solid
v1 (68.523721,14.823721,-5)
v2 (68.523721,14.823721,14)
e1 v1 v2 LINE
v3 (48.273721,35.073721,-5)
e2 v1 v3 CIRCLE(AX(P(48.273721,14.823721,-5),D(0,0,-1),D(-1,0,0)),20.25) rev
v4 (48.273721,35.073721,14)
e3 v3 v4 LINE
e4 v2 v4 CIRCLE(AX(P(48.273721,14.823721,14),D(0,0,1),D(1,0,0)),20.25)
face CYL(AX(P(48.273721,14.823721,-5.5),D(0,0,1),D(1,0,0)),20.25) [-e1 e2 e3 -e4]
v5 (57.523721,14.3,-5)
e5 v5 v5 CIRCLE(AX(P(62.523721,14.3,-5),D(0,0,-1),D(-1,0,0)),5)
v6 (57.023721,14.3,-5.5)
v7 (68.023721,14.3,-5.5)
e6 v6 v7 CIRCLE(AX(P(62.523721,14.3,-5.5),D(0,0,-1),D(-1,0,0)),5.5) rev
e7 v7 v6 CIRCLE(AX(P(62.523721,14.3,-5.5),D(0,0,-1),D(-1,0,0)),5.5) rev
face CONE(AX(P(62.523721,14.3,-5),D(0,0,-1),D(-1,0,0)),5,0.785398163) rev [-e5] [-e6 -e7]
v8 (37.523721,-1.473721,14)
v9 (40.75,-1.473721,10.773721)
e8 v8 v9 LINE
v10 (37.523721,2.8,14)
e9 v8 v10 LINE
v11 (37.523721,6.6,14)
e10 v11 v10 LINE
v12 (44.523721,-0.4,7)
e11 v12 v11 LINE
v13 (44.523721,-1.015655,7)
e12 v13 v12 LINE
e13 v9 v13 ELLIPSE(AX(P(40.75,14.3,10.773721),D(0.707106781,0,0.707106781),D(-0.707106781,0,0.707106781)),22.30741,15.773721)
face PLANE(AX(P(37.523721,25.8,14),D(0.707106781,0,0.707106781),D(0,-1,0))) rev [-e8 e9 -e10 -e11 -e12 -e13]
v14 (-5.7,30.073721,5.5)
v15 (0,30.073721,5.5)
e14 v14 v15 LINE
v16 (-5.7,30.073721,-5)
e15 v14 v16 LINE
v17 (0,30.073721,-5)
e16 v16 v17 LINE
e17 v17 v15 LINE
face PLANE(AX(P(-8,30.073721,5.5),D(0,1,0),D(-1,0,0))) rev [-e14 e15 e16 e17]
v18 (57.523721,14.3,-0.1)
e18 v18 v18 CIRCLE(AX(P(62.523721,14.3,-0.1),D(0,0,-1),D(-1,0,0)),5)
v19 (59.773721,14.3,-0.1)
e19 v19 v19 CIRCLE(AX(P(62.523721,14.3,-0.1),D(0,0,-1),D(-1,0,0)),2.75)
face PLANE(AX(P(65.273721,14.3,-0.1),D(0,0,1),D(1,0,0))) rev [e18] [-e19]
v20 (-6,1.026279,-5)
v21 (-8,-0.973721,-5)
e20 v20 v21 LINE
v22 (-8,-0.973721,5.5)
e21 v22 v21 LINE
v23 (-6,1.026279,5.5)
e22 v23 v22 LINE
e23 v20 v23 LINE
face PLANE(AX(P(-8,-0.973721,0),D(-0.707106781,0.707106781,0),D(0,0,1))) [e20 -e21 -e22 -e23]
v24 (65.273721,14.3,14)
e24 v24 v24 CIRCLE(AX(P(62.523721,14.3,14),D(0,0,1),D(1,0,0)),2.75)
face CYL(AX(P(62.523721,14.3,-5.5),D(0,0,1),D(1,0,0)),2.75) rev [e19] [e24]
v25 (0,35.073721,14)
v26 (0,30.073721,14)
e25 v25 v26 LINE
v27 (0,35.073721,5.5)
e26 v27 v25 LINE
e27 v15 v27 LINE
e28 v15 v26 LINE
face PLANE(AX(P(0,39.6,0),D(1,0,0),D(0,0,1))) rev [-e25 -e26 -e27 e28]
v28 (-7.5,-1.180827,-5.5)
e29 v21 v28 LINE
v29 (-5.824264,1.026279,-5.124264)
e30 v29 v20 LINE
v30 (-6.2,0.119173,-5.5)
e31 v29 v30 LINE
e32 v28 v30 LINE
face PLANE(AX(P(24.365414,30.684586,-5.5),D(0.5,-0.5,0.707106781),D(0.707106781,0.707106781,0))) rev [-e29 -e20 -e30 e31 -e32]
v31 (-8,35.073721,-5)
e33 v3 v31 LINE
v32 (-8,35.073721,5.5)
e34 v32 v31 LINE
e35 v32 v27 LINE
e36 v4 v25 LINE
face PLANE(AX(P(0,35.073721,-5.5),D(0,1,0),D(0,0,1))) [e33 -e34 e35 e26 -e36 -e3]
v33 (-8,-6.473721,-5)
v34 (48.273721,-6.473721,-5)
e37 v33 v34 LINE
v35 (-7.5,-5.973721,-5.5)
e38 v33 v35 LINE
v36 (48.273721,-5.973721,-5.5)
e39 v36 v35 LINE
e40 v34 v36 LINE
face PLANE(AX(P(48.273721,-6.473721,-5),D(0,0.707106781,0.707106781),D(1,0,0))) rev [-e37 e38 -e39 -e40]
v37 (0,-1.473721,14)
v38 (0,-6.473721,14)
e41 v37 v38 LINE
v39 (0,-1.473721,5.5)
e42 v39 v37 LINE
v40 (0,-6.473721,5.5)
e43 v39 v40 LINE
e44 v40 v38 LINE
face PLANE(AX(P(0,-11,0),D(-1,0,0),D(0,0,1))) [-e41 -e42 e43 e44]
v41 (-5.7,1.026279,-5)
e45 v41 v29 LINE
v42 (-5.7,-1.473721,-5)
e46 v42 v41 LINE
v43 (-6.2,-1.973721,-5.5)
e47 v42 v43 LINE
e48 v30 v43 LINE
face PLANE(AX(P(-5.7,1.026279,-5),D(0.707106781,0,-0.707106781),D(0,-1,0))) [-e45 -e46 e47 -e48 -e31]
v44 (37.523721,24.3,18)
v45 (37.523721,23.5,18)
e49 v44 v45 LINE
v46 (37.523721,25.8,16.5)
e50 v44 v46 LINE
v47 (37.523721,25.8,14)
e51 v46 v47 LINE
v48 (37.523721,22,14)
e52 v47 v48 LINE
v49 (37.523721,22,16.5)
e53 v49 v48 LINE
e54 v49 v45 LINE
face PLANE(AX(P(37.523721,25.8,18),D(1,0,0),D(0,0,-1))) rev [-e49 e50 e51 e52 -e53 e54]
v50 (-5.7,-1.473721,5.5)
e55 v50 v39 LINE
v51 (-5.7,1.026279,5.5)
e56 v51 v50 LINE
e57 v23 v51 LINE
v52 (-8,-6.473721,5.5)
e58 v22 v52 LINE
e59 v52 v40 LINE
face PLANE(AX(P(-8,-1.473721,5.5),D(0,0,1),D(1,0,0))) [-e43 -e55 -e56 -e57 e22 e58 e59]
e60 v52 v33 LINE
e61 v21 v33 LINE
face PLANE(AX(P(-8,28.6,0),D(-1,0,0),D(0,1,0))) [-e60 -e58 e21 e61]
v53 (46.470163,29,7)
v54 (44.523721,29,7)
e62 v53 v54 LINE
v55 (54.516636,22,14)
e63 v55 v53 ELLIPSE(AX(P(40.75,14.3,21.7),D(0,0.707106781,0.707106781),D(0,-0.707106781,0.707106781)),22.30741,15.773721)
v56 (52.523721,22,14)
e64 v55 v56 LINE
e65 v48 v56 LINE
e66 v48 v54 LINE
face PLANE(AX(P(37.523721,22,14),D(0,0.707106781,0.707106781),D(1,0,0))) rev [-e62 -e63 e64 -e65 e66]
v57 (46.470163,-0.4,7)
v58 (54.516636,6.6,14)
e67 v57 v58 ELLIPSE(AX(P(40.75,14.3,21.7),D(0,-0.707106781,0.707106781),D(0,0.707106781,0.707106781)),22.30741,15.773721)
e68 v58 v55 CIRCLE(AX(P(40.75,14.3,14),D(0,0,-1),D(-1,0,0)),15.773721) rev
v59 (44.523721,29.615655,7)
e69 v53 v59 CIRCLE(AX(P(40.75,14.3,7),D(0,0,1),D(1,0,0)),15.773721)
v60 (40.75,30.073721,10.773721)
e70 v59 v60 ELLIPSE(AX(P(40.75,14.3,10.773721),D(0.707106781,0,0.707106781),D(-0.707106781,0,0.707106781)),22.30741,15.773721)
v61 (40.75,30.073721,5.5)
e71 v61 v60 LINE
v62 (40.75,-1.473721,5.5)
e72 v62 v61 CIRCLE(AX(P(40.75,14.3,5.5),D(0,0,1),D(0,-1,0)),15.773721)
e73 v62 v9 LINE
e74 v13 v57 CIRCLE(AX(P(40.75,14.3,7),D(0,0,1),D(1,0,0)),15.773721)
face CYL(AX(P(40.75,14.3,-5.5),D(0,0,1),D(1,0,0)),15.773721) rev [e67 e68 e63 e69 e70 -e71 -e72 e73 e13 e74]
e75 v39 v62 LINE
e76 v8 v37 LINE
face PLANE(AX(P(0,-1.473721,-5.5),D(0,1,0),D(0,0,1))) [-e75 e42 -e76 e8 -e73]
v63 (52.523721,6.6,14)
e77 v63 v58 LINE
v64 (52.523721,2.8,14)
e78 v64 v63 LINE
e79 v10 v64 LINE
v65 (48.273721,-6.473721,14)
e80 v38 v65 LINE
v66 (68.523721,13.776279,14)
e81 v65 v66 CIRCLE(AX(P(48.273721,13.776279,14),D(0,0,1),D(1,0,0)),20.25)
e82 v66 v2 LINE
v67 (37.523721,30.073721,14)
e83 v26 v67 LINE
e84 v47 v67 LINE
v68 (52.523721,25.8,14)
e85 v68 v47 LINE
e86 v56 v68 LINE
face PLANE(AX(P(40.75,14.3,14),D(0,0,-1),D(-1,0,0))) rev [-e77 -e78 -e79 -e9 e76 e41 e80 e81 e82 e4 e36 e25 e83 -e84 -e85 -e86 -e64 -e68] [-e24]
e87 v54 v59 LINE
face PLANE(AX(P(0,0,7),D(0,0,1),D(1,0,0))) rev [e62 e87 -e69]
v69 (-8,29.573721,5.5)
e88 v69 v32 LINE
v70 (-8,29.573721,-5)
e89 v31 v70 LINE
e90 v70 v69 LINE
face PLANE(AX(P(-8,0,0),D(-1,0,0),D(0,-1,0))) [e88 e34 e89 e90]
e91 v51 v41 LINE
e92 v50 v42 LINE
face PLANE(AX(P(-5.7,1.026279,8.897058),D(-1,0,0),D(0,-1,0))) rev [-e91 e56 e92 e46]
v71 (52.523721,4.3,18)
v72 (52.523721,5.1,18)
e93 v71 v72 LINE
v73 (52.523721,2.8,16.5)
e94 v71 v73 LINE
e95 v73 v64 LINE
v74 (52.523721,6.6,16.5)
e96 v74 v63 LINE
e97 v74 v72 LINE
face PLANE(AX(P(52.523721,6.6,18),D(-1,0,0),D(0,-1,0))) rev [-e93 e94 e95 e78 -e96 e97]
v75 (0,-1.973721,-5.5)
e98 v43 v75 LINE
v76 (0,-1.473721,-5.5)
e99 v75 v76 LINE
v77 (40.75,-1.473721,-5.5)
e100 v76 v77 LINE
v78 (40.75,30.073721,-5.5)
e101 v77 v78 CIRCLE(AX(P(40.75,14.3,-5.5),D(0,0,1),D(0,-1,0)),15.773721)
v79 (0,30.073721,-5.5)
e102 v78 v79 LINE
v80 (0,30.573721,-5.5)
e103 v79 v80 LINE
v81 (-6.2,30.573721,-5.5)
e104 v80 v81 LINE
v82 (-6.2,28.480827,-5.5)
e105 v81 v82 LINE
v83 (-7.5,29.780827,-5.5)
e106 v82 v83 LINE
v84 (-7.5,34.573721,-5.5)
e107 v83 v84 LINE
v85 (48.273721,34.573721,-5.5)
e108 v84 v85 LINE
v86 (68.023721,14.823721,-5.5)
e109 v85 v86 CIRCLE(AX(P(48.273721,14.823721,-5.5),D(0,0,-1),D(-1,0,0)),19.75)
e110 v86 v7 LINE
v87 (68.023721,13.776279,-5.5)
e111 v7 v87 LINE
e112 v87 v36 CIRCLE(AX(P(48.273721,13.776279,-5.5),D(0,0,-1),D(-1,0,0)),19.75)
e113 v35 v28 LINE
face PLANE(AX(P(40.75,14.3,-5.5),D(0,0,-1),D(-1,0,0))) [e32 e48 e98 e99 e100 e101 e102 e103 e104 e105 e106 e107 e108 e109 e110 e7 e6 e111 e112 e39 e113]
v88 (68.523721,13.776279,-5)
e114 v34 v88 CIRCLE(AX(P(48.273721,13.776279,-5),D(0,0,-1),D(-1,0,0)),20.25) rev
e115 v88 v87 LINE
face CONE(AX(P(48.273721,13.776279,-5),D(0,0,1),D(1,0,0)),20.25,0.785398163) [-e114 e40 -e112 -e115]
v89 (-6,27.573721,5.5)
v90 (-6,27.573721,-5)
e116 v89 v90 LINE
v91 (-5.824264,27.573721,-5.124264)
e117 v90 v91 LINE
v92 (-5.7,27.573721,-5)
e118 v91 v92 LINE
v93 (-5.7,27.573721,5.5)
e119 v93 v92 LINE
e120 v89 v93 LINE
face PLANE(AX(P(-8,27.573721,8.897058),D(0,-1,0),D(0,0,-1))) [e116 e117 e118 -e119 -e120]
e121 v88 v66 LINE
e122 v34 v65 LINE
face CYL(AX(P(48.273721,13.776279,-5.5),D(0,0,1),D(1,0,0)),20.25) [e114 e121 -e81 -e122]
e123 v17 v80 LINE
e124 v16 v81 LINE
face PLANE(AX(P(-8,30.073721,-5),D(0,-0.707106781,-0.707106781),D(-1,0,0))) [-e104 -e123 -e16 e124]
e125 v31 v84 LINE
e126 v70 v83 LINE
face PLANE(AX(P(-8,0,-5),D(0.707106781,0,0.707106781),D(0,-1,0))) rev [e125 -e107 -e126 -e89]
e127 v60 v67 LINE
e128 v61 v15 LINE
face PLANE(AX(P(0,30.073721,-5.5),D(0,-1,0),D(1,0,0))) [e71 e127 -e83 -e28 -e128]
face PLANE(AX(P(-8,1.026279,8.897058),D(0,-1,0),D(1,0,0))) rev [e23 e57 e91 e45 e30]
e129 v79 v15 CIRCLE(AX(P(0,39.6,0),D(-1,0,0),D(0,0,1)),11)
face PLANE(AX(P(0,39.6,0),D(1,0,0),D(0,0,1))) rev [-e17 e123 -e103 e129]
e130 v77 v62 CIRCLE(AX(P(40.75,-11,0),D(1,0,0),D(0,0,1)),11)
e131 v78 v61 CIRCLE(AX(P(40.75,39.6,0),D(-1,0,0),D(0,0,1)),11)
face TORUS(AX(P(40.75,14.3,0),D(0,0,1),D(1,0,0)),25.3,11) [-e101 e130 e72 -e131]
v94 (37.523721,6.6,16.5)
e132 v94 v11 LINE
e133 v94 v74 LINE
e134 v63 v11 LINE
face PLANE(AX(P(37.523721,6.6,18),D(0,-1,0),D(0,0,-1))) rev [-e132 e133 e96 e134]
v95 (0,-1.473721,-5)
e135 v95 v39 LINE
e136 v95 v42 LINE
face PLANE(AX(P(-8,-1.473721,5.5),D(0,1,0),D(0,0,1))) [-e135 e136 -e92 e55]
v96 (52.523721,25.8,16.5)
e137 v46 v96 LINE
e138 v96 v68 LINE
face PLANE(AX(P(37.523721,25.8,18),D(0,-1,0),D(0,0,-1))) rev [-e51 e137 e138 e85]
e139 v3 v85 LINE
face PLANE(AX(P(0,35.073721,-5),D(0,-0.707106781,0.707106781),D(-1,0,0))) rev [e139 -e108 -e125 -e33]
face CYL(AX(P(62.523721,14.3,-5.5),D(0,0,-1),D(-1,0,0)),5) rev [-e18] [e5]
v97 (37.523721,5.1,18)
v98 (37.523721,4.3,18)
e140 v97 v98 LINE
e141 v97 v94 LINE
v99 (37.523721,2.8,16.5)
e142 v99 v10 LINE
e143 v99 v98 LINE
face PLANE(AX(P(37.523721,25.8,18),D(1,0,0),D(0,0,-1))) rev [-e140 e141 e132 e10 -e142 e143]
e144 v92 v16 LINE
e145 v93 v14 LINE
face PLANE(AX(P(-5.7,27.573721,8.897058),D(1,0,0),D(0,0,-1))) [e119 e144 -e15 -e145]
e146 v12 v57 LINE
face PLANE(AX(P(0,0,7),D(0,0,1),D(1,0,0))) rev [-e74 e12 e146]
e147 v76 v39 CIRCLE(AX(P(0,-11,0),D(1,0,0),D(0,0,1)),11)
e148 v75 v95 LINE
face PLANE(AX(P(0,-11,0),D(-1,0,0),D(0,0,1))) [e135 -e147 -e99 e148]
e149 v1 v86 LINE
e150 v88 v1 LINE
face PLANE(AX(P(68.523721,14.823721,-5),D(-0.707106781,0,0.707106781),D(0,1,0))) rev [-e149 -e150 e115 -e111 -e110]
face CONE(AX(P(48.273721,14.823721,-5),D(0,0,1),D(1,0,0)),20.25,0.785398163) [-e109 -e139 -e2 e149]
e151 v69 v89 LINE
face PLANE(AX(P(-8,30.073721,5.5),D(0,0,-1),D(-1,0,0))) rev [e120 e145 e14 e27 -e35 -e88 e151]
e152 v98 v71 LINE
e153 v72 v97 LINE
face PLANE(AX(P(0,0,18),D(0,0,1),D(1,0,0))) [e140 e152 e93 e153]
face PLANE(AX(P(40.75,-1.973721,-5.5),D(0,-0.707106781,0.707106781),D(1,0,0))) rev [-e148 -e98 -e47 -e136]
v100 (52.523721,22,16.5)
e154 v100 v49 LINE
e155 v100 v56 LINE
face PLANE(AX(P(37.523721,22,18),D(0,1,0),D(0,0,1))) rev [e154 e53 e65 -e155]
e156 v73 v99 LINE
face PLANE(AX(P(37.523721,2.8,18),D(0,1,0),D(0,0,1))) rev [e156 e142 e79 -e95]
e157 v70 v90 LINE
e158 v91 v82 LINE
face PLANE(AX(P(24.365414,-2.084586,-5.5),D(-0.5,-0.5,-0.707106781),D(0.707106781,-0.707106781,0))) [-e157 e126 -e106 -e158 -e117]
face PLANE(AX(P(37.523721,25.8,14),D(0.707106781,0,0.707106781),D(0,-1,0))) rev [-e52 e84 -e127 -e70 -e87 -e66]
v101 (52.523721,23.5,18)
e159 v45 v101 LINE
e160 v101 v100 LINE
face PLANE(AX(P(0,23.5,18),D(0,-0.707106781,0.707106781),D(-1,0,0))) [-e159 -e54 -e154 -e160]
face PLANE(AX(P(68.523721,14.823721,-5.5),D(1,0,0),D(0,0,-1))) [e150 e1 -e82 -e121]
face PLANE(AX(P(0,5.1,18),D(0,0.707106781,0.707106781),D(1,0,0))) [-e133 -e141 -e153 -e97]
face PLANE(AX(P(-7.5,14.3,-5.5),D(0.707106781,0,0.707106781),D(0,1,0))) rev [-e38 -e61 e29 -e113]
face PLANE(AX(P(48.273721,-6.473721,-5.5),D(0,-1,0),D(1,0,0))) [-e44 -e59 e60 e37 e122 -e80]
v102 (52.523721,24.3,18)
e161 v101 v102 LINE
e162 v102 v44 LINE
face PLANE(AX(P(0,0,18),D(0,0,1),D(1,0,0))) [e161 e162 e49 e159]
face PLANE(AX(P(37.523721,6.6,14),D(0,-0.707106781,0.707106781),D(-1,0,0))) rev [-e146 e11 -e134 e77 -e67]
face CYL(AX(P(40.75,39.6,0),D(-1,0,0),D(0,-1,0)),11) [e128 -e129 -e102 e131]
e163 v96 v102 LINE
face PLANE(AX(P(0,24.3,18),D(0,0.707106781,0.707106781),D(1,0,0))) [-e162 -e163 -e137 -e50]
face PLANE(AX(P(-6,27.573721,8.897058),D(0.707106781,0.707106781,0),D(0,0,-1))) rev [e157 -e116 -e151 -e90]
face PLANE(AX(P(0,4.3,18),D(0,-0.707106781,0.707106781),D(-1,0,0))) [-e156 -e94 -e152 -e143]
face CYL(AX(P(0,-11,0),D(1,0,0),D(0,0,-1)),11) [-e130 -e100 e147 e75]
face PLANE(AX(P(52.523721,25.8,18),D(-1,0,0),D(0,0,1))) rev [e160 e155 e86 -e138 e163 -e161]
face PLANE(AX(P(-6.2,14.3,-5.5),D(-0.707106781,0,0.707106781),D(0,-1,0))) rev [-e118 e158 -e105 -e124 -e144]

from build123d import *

# Parameters (mm, degrees)
BOSS_EXTRUDE1_DEPTH                                 = 14
BOSS_EXTRUDE1_DEPTH_BACK                            = 5.5
SKETCH3_R                                           = 2.750000000000022
BOSS_EXTRUDE2_DEPTH                                 = 7
CBORE_FOR_M5_HEX_SOCKET_HEAD_CAP_SCREW2_D           = 5.5
CBORE_FOR_M5_HEX_SOCKET_HEAD_CAP_SCREW2_CBORE_D     = 10
CBORE_FOR_M5_HEX_SOCKET_HEAD_CAP_SCREW2_CBORE_DEPTH = 5.4
SKETCH11_W                                          = 15
SKETCH11_H                                          = 3.8000000000000007
BOSS_EXTRUDE3_DEPTH                                 = 4
CHAMFER1_SIZE                                       = 1.5
CUT_EXTRUDE1_DEPTH                                  = 7
SKETCH13_W                                          = 15
SKETCH13_H                                          = 15.400000000000002
CUT_EXTRUDE2_DEPTH                                  = 7
CUT_EXTRUDE3_DEPTH                                  = 7
SKETCH15_W                                          = 11
SKETCH15_H                                          = 5
BOSS_EXTRUDE4_DEPTH                                 = 8
SKETCH16_W                                          = 2.3
SKETCH16_H                                          = 2.5
BOSS_EXTRUDE5_DEPTH                                 = 11
CHAMFER4_SIZE                                       = 2
CHAMFER3_SIZE                                       = 0.5
CHAMFER5_SIZE                                       = 7


# Some blends are built 0.0001 mm under size
with BuildPart() as part:
    # Sweep1: sweep along a path in Sketch1
    with BuildLine(Plane.XY) as sweep1_path:
        Line((0, 0), (40.75, 0))
        ThreePointArc((40.75, 0), (55.05, 14.3), (40.75, 28.6))
        Line((40.75, 28.6), (0, 28.599999999999998))
    # Sketch2 → Sweep1 (sweep)
    with BuildSketch(Plane(origin=(0, 0, 0), x_dir=(0, 0, -1), z_dir=(1, 0, 0))):
        with BuildLine():
            Line((-5.500000000000001, -1.4737205583711734), (5.499999999999999, -1.4737205583711734))
            ThreePointArc((5.499999999999999, -1.4737205583711734), (-1.9e-16, 1.78e-15), (-5.500000000000001, -1.4737205583711734))
        make_face()
    sweep(path=sweep1_path.line)

    # Sketch3 → Boss-Extrude1 (add, two sides: drawn at the far end of the back side and taken through both)
    with BuildSketch(Plane.XY.offset(-BOSS_EXTRUDE1_DEPTH_BACK)):
        with BuildLine():
            Line((-7e-17, 30.07372055837117), (0, 35.07372055837117))
            Line((0, 35.07372055837117), (48.273720558371174, 35.07372055837117))
            ThreePointArc((48.273720558371174, 35.07372055837117), (62.59263287739877, 29.14263287739876), (68.52372055837118, 14.82372055837117))
            Line((68.52372055837118, 14.82372055837117), (68.52372055837118, 13.776279441628832))
            ThreePointArc((68.52372055837118, 13.776279441628832), (62.59263287739876, -0.5426328773987557), (48.273720558371174, -6.473720558371171))
            Line((48.273720558371174, -6.473720558371171), (0, -6.473720558371174))
            Line((0, -6.473720558371174), (0, -1.4737205583711734))
            Line((0, -1.4737205583711734), (40.75, -1.4737205583711734))
            ThreePointArc((40.75, -1.4737205583711734), (56.523720558371174, 14.3), (40.75, 30.073720558371175))
            Line((40.75, 30.073720558371175), (-7e-17, 30.07372055837117))
        make_face()
        with Locations((62.52372055837116, 14.299999999999999)):
            Circle(SKETCH3_R, mode=Mode.SUBTRACT)
    extrude(amount=BOSS_EXTRUDE1_DEPTH + BOSS_EXTRUDE1_DEPTH_BACK)

    # Sketch10 → Boss-Extrude2 (add)
    with BuildSketch(Plane.XY.offset(14)):
        Polygon((33.523720558371174, 30.07372055837117), (56.523720558371174, 30.07372055837117), (56.52372055837118, -1.473720558371177), (33.523720558371174, -1.4737205583711734), align=None)
    extrude(amount=-BOSS_EXTRUDE2_DEPTH)

    # CBORE for M5 Hex Socket Head Cap Screw2 (through all)
    with Locations(Plane(origin=(0, 0, -5.5), x_dir=(-1, 0, 0), z_dir=(0, 0, -1))):
        with Locations((-62.523720558, 14.3)):
            CounterBoreHole(CBORE_FOR_M5_HEX_SOCKET_HEAD_CAP_SCREW2_D / 2, CBORE_FOR_M5_HEX_SOCKET_HEAD_CAP_SCREW2_CBORE_D / 2, CBORE_FOR_M5_HEX_SOCKET_HEAD_CAP_SCREW2_CBORE_DEPTH)

    # Sketch11 → Boss-Extrude3 (add)
    with BuildSketch(Plane.XY.offset(14)):
        with Locations((45.02372055837117, 23.9)):
            Rectangle(SKETCH11_W, SKETCH11_H)
        Polygon((37.52372055837117, 6.599999999999998), (52.52372055837117, 6.599999999999998), (52.523720558371174, 2.799999999999997), (37.52372055837117, 2.799999999999997), align=None)
    extrude(amount=BOSS_EXTRUDE3_DEPTH)

    # Chamfer1
    chamfer1_edges = [part.edges().sort_by_distance(p)[0] for p in [
        (45.02372055837117, 22, 18),
        (45.02372055837117, 25.8, 18),
        (45.02372055837117, 2.799999999999997, 18),
        (45.02372055837117, 6.599999999999998, 18),
    ]]
    chamfer(chamfer1_edges, length=CHAMFER1_SIZE)

    # Sketch12 → Cut-Extrude1 (cut)
    with BuildSketch(Plane.XY.offset(14)):
        Polygon((33.523720558371174, 30.07372055837117), (37.52372055837117, 30.07372055837117), (37.52372055837118, -1.4737205583711734), (33.523720558371174, -1.4737205583711734), align=None)
    extrude(amount=-CUT_EXTRUDE1_DEPTH, mode=Mode.SUBTRACT)

    # Sketch13 → Cut-Extrude2 (cut)
    with BuildSketch(Plane.XY.offset(14)):
        with Locations((45.02372055837117, 14.299999999999999)):
            Rectangle(SKETCH13_W, SKETCH13_H)
    extrude(amount=-CUT_EXTRUDE2_DEPTH, mode=Mode.SUBTRACT)

    # Sketch14 → Cut-Extrude3 (cut)
    with BuildSketch(Plane(origin=(0, 0, 7), x_dir=(-1, 0, 0), z_dir=(0, 0, -1))):
        with BuildLine():
            Line((-52.52372055837117, 22), (-54.51663576381613, 22))
            ThreePointArc((-54.51663576381613, 22), (-56.52372055837116, 14.3), (-54.516635763816126, 6.599999999999999))
            Line((-54.516635763816126, 6.599999999999999), (-52.52372055837117, 6.599999999999998))
            Line((-52.52372055837117, 6.599999999999998), (-52.52372055837117, 22))
        make_face()
    extrude(amount=-CUT_EXTRUDE3_DEPTH, mode=Mode.SUBTRACT)

    # Sketch15 → Boss-Extrude4 (add)
    with BuildSketch(Plane.ZY):
        with Locations((4.4e-16, 32.57372055837117)):
            Rectangle(SKETCH15_W, SKETCH15_H)
    boss_extrude4 = extrude(amount=BOSS_EXTRUDE4_DEPTH)

    # Sketch16 → Boss-Extrude5 (add)
    with BuildSketch(Plane(origin=(0, 0, -5.5), x_dir=(-1, 0, 0), z_dir=(0, 0, -1))):
        with Locations((6.850000000000001, 28.82372055837117)):
            Rectangle(SKETCH16_W, SKETCH16_H)
    boss_extrude5 = extrude(amount=-BOSS_EXTRUDE5_DEPTH)

    # Mirror1: Boss-Extrude4, Boss-Extrude5 across plane
    add(boss_extrude4.mirror(Plane(origin=(-6.1e-16, 14.299999999999997, 0), x_dir=(0, 0, 1), z_dir=(4e-17, -1, 0))))
    add(boss_extrude5.mirror(Plane(origin=(-6.1e-16, 14.299999999999997, 0), x_dir=(0, 0, 1), z_dir=(4e-17, -1, 0))))

    # Chamfer4
    chamfer4_edges = [part.edges().sort_by_distance(p)[0] for p in [
        (-8.000000000000002, 27.57372055837117, 0),
        (-8, 1.026279441628823, 0),
    ]]
    chamfer(chamfer4_edges, length=CHAMFER4_SIZE)

    # Chamfer3
    # the kernel refuses this chamfer: 0.5 mm, written as the material it takes off along each edge
    with BuildSketch(Plane(origin=(-8, 28.287879064388214, -5.5), x_dir=(0.9996219169112968, 0, -0.027495876610585647), z_dir=(-2.4e-16, 1, 0))) as chamfer3_piece_1:
        Polygon((CHAMFER3_SIZE * 0.999621916911, -CHAMFER3_SIZE * 0.0274958766106), (-CHAMFER3_SIZE * 0.0274958766106, -CHAMFER3_SIZE * 0.999621916911), (0, 0), align=None)
    extrude(amount=8.071682987965907, mode=Mode.SUBTRACT)
    with BuildSketch(Plane(origin=(48.273720558371174, 35.073720558371164, -5.5), x_dir=(0, -0.9996219169112968, -0.02749587661058574), z_dir=(-1, 1.3e-16, 0))) as chamfer3_piece_2:
        Polygon((CHAMFER3_SIZE * 0.999621916911, CHAMFER3_SIZE * 0.0274958766106), (-CHAMFER3_SIZE * 0.0274958766106, CHAMFER3_SIZE * 0.999621916911), (0, 0), align=None)
    extrude(amount=57.55956205235414, mode=Mode.SUBTRACT)
    with BuildSketch(Plane(origin=(48.273720558371195, 14.823720558371178, -5.5), x_dir=(-1.05e-15, 1, 0), z_dir=(-1, -1.05e-15, 0))) as chamfer3_piece_3:
        Polygon((20.249999999999986 - CHAMFER3_SIZE, 0), (20.249999999999986, -CHAMFER3_SIZE), (20.249999999999986, 0), align=None)
    revolve(axis=Axis((48.273720558371195, 14.823720558371178, -5.5), (0, 0, -1)), revolution_arc=90.00000000000009, mode=Mode.SUBTRACT)
    with BuildSketch(Plane(origin=(68.52372055837118, 14.82372055837117, -5.5), x_dir=(-0.9996219169112968, 0, -0.02749587661058574), z_dir=(0, -1, 0))) as chamfer3_piece_4:
        Polygon((CHAMFER3_SIZE * 0.999621916911, -CHAMFER3_SIZE * 0.0274958766106), (-CHAMFER3_SIZE * 0.0274958766106, -CHAMFER3_SIZE * 0.999621916911), (0, 0), align=None)
    extrude(amount=1.0474411167423376, mode=Mode.SUBTRACT)
    with BuildSketch(Plane(origin=(-2.56e-15, 30.07372055837117, -5.5), x_dir=(0, 0.9996219169112968, -0.02749587661058555), z_dir=(-1, -9e-17, 0))) as chamfer3_piece_5:
        Polygon((CHAMFER3_SIZE * 0.999621916911, -CHAMFER3_SIZE * 0.0274958766106), (-CHAMFER3_SIZE * 0.0274958766106, -CHAMFER3_SIZE * 0.999621916911), (0, 0), align=None)
    extrude(amount=5.699999999999999, mode=Mode.SUBTRACT)
    with BuildSketch(Plane(origin=(-5.700000000000003, 26.287879064388214, -5.5), x_dir=(-0.9996219169112968, 0, -0.027495876610585647), z_dir=(0, 1, 0))) as chamfer3_piece_6:
        Polygon((CHAMFER3_SIZE * 0.999621916911, CHAMFER3_SIZE * 0.0274958766106), (-CHAMFER3_SIZE * 0.0274958766106, CHAMFER3_SIZE * 0.999621916911), (0, 0), align=None)
    extrude(amount=3.785841493982957, mode=Mode.SUBTRACT)
    with BuildSketch(Plane(origin=(48.27372055837117, 13.776279441628848, -5.5), x_dir=(1, -7.9e-16, 0), z_dir=(7.9e-16, 1, 0))) as chamfer3_piece_7:
        Polygon((20.250000000000014 - CHAMFER3_SIZE, 0), (20.250000000000014, -CHAMFER3_SIZE), (20.250000000000014, 0), align=None)
    revolve(axis=Axis((48.27372055837117, 13.776279441628848, -5.5), (0, 0, -1)), revolution_arc=89.99999999999993, mode=Mode.SUBTRACT)
    with BuildSketch(Plane(origin=(-9.285841493982957, -6.473720558371173, -5.5), x_dir=(0, 0.9996219169112968, -0.027495876610585647), z_dir=(1, 1.6e-16, 0))) as chamfer3_piece_8:
        Polygon((CHAMFER3_SIZE * 0.999621916911, CHAMFER3_SIZE * 0.0274958766106), (-CHAMFER3_SIZE * 0.0274958766106, CHAMFER3_SIZE * 0.999621916911), (0, 0), align=None)
    extrude(amount=57.55956205235413, mode=Mode.SUBTRACT)
    with BuildSketch(Plane(origin=(-8, 0.312120935611782, -5.5), x_dir=(0.9996219169112968, 0, -0.027495876610585647), z_dir=(-2.4e-16, -1, 0))) as chamfer3_piece_9:
        Polygon((CHAMFER3_SIZE * 0.999621916911, CHAMFER3_SIZE * 0.0274958766106), (-CHAMFER3_SIZE * 0.0274958766106, CHAMFER3_SIZE * 0.999621916911), (0, 0), align=None)
    extrude(amount=8.071682987965918, mode=Mode.SUBTRACT)
    with BuildSketch(Plane(origin=(-1.22e-15, -1.473720558371177, -5.5), x_dir=(0, -0.9996219169112968, -0.027495876610585623), z_dir=(-1, 0, 0))) as chamfer3_piece_10:
        Polygon((CHAMFER3_SIZE * 0.999621916911, CHAMFER3_SIZE * 0.0274958766106), (-CHAMFER3_SIZE * 0.0274958766106, CHAMFER3_SIZE * 0.999621916911), (0, 0), align=None)
    extrude(amount=5.699999999999999, mode=Mode.SUBTRACT)
    with BuildSketch(Plane(origin=(-5.700000000000003, 2.312120935611784, -5.5), x_dir=(-0.9996219169112968, 0, -0.027495876610585647), z_dir=(9e-17, -1, 0))) as chamfer3_piece_11:
        Polygon((CHAMFER3_SIZE * 0.999621916911, -CHAMFER3_SIZE * 0.0274958766106), (-CHAMFER3_SIZE * 0.0274958766106, -CHAMFER3_SIZE * 0.999621916911), (0, 0), align=None)
    extrude(amount=3.7858414939829608, mode=Mode.SUBTRACT)
    with BuildSketch(Plane(origin=(-8.909227239926395, 30.482947798297563, -5.5), x_dir=(0.7068394360706736, 0.7068394360706736, -0.027495876610585765), z_dir=(0.7071067811865476, -0.7071067811865476, 0))) as chamfer3_piece_12:
        Polygon((CHAMFER3_SIZE * 0.999621916911, CHAMFER3_SIZE * 0.0274958766106), (-CHAMFER3_SIZE * 0.0274958766106, CHAMFER3_SIZE * 0.999621916911), (0, 0), align=None)
    extrude(amount=5.400110112712111, mode=Mode.SUBTRACT)
    with BuildSketch(Plane(origin=(-5.090772760073612, 1.9355066815552142, -5.5), x_dir=(0.7068394360706735, -0.7068394360706735, -0.02749587661058555), z_dir=(-0.7071067811865476, -0.7071067811865476, 0))) as chamfer3_piece_13:
        Polygon((CHAMFER3_SIZE * 0.999621916911, CHAMFER3_SIZE * 0.0274958766106), (-CHAMFER3_SIZE * 0.0274958766106, CHAMFER3_SIZE * 0.999621916911), (0, 0), align=None)
    extrude(amount=5.400110112712108, mode=Mode.SUBTRACT)
    with BuildSketch(Plane(origin=(62.523720558, 14.3, -5.5), x_dir=(-1, 0, 0), z_dir=(0, -1, 0))) as chamfer3_piece_14:
        Polygon((5 + CHAMFER3_SIZE, 0), (5, -CHAMFER3_SIZE), (5, 0), align=None)
    revolve(axis=Axis((62.523720558, 14.3, -5.5), (0, 0, -1)), mode=Mode.SUBTRACT)
    with BuildSketch(Plane(origin=(-5.700000000000003, 26.287879064388214, -5.5), x_dir=(-0.9996219169112968, 0, -0.027495876610585647), z_dir=(0, 1, 0))) as chamfer3_piece_15a_section:
        Polygon((CHAMFER3_SIZE * 0.999621916911, CHAMFER3_SIZE * 0.0274958766106), (-CHAMFER3_SIZE * 0.0274958766106, CHAMFER3_SIZE * 0.999621916911), (0, 0), align=None)
    chamfer3_piece_15a = extrude(amount=5.071682987965914, mode=Mode.PRIVATE)
    chamfer3_piece_15a = split(chamfer3_piece_15a, bisect_by=Plane(origin=(-5.86489681340297, 30.07372055837117, -5.335103186597029), z_dir=(-9e-17, 1, 0)), keep=Keep.TOP, mode=Mode.PRIVATE)
    with BuildSketch(Plane(origin=(-2.56e-15, 30.07372055837117, -5.5), x_dir=(0, 0.9996219169112968, -0.02749587661058555), z_dir=(-1, -9e-17, 0))) as chamfer3_piece_15b_section:
        Polygon((CHAMFER3_SIZE * 0.999621916911, -CHAMFER3_SIZE * 0.0274958766106), (-CHAMFER3_SIZE * 0.0274958766106, -CHAMFER3_SIZE * 0.999621916911), (0, 0), align=None)
    chamfer3_piece_15b = extrude(amount=6.985841493982957, mode=Mode.PRIVATE)
    chamfer3_piece_15b = split(chamfer3_piece_15b, bisect_by=Plane(origin=(-5.700000000000002, 30.238617371774144, -5.33510318659703), z_dir=(-1, 0, 0)), keep=Keep.TOP, mode=Mode.PRIVATE)
    chamfer3_piece_15 = chamfer3_piece_15a & chamfer3_piece_15b
    add(chamfer3_piece_15, mode=Mode.SUBTRACT)
    with BuildSketch(Plane(origin=(-1.22e-15, -1.473720558371177, -5.5), x_dir=(0, -0.9996219169112968, -0.027495876610585623), z_dir=(-1, 0, 0))) as chamfer3_piece_16a_section:
        Polygon((CHAMFER3_SIZE * 0.999621916911, CHAMFER3_SIZE * 0.0274958766106), (-CHAMFER3_SIZE * 0.0274958766106, CHAMFER3_SIZE * 0.999621916911), (0, 0), align=None)
    chamfer3_piece_16a = extrude(amount=6.9858414939829565, mode=Mode.PRIVATE)
    chamfer3_piece_16a = split(chamfer3_piece_16a, bisect_by=Plane(origin=(-5.7, -1.6386173717741457, -5.335103186597028), z_dir=(-1, -9e-17, 0)), keep=Keep.TOP, mode=Mode.PRIVATE)
    with BuildSketch(Plane(origin=(-5.700000000000003, 2.312120935611784, -5.5), x_dir=(-0.9996219169112968, 0, -0.027495876610585647), z_dir=(9e-17, -1, 0))) as chamfer3_piece_16b_section:
        Polygon((CHAMFER3_SIZE * 0.999621916911, -CHAMFER3_SIZE * 0.0274958766106), (-CHAMFER3_SIZE * 0.0274958766106, -CHAMFER3_SIZE * 0.999621916911), (0, 0), align=None)
    chamfer3_piece_16b = extrude(amount=5.0716829879659215, mode=Mode.PRIVATE)
    chamfer3_piece_16b = split(chamfer3_piece_16b, bisect_by=Plane(origin=(-5.864896813402971, -1.473720558371177, -5.33510318659703), z_dir=(0, -1, 0)), keep=Keep.TOP, mode=Mode.PRIVATE)
    chamfer3_piece_16 = chamfer3_piece_16a & chamfer3_piece_16b
    add(chamfer3_piece_16, mode=Mode.SUBTRACT)

    # Chamfer5
    chamfer5_edges = [part.edges().sort_by_distance(p)[0] for p in [
        (46.02017816109365, 6.599999999999998, 7),
        (37.52372055837118, 2.563139720814412, 7),
        (46.020178161093654, 22, 7),
        (37.52372055837117, 26.036860279185586, 7),
    ]]
    chamfer(chamfer5_edges, length=CHAMFER5_SIZE - 0.0001)  # a hair under: the kernel refuses the full size


solid = part.part
